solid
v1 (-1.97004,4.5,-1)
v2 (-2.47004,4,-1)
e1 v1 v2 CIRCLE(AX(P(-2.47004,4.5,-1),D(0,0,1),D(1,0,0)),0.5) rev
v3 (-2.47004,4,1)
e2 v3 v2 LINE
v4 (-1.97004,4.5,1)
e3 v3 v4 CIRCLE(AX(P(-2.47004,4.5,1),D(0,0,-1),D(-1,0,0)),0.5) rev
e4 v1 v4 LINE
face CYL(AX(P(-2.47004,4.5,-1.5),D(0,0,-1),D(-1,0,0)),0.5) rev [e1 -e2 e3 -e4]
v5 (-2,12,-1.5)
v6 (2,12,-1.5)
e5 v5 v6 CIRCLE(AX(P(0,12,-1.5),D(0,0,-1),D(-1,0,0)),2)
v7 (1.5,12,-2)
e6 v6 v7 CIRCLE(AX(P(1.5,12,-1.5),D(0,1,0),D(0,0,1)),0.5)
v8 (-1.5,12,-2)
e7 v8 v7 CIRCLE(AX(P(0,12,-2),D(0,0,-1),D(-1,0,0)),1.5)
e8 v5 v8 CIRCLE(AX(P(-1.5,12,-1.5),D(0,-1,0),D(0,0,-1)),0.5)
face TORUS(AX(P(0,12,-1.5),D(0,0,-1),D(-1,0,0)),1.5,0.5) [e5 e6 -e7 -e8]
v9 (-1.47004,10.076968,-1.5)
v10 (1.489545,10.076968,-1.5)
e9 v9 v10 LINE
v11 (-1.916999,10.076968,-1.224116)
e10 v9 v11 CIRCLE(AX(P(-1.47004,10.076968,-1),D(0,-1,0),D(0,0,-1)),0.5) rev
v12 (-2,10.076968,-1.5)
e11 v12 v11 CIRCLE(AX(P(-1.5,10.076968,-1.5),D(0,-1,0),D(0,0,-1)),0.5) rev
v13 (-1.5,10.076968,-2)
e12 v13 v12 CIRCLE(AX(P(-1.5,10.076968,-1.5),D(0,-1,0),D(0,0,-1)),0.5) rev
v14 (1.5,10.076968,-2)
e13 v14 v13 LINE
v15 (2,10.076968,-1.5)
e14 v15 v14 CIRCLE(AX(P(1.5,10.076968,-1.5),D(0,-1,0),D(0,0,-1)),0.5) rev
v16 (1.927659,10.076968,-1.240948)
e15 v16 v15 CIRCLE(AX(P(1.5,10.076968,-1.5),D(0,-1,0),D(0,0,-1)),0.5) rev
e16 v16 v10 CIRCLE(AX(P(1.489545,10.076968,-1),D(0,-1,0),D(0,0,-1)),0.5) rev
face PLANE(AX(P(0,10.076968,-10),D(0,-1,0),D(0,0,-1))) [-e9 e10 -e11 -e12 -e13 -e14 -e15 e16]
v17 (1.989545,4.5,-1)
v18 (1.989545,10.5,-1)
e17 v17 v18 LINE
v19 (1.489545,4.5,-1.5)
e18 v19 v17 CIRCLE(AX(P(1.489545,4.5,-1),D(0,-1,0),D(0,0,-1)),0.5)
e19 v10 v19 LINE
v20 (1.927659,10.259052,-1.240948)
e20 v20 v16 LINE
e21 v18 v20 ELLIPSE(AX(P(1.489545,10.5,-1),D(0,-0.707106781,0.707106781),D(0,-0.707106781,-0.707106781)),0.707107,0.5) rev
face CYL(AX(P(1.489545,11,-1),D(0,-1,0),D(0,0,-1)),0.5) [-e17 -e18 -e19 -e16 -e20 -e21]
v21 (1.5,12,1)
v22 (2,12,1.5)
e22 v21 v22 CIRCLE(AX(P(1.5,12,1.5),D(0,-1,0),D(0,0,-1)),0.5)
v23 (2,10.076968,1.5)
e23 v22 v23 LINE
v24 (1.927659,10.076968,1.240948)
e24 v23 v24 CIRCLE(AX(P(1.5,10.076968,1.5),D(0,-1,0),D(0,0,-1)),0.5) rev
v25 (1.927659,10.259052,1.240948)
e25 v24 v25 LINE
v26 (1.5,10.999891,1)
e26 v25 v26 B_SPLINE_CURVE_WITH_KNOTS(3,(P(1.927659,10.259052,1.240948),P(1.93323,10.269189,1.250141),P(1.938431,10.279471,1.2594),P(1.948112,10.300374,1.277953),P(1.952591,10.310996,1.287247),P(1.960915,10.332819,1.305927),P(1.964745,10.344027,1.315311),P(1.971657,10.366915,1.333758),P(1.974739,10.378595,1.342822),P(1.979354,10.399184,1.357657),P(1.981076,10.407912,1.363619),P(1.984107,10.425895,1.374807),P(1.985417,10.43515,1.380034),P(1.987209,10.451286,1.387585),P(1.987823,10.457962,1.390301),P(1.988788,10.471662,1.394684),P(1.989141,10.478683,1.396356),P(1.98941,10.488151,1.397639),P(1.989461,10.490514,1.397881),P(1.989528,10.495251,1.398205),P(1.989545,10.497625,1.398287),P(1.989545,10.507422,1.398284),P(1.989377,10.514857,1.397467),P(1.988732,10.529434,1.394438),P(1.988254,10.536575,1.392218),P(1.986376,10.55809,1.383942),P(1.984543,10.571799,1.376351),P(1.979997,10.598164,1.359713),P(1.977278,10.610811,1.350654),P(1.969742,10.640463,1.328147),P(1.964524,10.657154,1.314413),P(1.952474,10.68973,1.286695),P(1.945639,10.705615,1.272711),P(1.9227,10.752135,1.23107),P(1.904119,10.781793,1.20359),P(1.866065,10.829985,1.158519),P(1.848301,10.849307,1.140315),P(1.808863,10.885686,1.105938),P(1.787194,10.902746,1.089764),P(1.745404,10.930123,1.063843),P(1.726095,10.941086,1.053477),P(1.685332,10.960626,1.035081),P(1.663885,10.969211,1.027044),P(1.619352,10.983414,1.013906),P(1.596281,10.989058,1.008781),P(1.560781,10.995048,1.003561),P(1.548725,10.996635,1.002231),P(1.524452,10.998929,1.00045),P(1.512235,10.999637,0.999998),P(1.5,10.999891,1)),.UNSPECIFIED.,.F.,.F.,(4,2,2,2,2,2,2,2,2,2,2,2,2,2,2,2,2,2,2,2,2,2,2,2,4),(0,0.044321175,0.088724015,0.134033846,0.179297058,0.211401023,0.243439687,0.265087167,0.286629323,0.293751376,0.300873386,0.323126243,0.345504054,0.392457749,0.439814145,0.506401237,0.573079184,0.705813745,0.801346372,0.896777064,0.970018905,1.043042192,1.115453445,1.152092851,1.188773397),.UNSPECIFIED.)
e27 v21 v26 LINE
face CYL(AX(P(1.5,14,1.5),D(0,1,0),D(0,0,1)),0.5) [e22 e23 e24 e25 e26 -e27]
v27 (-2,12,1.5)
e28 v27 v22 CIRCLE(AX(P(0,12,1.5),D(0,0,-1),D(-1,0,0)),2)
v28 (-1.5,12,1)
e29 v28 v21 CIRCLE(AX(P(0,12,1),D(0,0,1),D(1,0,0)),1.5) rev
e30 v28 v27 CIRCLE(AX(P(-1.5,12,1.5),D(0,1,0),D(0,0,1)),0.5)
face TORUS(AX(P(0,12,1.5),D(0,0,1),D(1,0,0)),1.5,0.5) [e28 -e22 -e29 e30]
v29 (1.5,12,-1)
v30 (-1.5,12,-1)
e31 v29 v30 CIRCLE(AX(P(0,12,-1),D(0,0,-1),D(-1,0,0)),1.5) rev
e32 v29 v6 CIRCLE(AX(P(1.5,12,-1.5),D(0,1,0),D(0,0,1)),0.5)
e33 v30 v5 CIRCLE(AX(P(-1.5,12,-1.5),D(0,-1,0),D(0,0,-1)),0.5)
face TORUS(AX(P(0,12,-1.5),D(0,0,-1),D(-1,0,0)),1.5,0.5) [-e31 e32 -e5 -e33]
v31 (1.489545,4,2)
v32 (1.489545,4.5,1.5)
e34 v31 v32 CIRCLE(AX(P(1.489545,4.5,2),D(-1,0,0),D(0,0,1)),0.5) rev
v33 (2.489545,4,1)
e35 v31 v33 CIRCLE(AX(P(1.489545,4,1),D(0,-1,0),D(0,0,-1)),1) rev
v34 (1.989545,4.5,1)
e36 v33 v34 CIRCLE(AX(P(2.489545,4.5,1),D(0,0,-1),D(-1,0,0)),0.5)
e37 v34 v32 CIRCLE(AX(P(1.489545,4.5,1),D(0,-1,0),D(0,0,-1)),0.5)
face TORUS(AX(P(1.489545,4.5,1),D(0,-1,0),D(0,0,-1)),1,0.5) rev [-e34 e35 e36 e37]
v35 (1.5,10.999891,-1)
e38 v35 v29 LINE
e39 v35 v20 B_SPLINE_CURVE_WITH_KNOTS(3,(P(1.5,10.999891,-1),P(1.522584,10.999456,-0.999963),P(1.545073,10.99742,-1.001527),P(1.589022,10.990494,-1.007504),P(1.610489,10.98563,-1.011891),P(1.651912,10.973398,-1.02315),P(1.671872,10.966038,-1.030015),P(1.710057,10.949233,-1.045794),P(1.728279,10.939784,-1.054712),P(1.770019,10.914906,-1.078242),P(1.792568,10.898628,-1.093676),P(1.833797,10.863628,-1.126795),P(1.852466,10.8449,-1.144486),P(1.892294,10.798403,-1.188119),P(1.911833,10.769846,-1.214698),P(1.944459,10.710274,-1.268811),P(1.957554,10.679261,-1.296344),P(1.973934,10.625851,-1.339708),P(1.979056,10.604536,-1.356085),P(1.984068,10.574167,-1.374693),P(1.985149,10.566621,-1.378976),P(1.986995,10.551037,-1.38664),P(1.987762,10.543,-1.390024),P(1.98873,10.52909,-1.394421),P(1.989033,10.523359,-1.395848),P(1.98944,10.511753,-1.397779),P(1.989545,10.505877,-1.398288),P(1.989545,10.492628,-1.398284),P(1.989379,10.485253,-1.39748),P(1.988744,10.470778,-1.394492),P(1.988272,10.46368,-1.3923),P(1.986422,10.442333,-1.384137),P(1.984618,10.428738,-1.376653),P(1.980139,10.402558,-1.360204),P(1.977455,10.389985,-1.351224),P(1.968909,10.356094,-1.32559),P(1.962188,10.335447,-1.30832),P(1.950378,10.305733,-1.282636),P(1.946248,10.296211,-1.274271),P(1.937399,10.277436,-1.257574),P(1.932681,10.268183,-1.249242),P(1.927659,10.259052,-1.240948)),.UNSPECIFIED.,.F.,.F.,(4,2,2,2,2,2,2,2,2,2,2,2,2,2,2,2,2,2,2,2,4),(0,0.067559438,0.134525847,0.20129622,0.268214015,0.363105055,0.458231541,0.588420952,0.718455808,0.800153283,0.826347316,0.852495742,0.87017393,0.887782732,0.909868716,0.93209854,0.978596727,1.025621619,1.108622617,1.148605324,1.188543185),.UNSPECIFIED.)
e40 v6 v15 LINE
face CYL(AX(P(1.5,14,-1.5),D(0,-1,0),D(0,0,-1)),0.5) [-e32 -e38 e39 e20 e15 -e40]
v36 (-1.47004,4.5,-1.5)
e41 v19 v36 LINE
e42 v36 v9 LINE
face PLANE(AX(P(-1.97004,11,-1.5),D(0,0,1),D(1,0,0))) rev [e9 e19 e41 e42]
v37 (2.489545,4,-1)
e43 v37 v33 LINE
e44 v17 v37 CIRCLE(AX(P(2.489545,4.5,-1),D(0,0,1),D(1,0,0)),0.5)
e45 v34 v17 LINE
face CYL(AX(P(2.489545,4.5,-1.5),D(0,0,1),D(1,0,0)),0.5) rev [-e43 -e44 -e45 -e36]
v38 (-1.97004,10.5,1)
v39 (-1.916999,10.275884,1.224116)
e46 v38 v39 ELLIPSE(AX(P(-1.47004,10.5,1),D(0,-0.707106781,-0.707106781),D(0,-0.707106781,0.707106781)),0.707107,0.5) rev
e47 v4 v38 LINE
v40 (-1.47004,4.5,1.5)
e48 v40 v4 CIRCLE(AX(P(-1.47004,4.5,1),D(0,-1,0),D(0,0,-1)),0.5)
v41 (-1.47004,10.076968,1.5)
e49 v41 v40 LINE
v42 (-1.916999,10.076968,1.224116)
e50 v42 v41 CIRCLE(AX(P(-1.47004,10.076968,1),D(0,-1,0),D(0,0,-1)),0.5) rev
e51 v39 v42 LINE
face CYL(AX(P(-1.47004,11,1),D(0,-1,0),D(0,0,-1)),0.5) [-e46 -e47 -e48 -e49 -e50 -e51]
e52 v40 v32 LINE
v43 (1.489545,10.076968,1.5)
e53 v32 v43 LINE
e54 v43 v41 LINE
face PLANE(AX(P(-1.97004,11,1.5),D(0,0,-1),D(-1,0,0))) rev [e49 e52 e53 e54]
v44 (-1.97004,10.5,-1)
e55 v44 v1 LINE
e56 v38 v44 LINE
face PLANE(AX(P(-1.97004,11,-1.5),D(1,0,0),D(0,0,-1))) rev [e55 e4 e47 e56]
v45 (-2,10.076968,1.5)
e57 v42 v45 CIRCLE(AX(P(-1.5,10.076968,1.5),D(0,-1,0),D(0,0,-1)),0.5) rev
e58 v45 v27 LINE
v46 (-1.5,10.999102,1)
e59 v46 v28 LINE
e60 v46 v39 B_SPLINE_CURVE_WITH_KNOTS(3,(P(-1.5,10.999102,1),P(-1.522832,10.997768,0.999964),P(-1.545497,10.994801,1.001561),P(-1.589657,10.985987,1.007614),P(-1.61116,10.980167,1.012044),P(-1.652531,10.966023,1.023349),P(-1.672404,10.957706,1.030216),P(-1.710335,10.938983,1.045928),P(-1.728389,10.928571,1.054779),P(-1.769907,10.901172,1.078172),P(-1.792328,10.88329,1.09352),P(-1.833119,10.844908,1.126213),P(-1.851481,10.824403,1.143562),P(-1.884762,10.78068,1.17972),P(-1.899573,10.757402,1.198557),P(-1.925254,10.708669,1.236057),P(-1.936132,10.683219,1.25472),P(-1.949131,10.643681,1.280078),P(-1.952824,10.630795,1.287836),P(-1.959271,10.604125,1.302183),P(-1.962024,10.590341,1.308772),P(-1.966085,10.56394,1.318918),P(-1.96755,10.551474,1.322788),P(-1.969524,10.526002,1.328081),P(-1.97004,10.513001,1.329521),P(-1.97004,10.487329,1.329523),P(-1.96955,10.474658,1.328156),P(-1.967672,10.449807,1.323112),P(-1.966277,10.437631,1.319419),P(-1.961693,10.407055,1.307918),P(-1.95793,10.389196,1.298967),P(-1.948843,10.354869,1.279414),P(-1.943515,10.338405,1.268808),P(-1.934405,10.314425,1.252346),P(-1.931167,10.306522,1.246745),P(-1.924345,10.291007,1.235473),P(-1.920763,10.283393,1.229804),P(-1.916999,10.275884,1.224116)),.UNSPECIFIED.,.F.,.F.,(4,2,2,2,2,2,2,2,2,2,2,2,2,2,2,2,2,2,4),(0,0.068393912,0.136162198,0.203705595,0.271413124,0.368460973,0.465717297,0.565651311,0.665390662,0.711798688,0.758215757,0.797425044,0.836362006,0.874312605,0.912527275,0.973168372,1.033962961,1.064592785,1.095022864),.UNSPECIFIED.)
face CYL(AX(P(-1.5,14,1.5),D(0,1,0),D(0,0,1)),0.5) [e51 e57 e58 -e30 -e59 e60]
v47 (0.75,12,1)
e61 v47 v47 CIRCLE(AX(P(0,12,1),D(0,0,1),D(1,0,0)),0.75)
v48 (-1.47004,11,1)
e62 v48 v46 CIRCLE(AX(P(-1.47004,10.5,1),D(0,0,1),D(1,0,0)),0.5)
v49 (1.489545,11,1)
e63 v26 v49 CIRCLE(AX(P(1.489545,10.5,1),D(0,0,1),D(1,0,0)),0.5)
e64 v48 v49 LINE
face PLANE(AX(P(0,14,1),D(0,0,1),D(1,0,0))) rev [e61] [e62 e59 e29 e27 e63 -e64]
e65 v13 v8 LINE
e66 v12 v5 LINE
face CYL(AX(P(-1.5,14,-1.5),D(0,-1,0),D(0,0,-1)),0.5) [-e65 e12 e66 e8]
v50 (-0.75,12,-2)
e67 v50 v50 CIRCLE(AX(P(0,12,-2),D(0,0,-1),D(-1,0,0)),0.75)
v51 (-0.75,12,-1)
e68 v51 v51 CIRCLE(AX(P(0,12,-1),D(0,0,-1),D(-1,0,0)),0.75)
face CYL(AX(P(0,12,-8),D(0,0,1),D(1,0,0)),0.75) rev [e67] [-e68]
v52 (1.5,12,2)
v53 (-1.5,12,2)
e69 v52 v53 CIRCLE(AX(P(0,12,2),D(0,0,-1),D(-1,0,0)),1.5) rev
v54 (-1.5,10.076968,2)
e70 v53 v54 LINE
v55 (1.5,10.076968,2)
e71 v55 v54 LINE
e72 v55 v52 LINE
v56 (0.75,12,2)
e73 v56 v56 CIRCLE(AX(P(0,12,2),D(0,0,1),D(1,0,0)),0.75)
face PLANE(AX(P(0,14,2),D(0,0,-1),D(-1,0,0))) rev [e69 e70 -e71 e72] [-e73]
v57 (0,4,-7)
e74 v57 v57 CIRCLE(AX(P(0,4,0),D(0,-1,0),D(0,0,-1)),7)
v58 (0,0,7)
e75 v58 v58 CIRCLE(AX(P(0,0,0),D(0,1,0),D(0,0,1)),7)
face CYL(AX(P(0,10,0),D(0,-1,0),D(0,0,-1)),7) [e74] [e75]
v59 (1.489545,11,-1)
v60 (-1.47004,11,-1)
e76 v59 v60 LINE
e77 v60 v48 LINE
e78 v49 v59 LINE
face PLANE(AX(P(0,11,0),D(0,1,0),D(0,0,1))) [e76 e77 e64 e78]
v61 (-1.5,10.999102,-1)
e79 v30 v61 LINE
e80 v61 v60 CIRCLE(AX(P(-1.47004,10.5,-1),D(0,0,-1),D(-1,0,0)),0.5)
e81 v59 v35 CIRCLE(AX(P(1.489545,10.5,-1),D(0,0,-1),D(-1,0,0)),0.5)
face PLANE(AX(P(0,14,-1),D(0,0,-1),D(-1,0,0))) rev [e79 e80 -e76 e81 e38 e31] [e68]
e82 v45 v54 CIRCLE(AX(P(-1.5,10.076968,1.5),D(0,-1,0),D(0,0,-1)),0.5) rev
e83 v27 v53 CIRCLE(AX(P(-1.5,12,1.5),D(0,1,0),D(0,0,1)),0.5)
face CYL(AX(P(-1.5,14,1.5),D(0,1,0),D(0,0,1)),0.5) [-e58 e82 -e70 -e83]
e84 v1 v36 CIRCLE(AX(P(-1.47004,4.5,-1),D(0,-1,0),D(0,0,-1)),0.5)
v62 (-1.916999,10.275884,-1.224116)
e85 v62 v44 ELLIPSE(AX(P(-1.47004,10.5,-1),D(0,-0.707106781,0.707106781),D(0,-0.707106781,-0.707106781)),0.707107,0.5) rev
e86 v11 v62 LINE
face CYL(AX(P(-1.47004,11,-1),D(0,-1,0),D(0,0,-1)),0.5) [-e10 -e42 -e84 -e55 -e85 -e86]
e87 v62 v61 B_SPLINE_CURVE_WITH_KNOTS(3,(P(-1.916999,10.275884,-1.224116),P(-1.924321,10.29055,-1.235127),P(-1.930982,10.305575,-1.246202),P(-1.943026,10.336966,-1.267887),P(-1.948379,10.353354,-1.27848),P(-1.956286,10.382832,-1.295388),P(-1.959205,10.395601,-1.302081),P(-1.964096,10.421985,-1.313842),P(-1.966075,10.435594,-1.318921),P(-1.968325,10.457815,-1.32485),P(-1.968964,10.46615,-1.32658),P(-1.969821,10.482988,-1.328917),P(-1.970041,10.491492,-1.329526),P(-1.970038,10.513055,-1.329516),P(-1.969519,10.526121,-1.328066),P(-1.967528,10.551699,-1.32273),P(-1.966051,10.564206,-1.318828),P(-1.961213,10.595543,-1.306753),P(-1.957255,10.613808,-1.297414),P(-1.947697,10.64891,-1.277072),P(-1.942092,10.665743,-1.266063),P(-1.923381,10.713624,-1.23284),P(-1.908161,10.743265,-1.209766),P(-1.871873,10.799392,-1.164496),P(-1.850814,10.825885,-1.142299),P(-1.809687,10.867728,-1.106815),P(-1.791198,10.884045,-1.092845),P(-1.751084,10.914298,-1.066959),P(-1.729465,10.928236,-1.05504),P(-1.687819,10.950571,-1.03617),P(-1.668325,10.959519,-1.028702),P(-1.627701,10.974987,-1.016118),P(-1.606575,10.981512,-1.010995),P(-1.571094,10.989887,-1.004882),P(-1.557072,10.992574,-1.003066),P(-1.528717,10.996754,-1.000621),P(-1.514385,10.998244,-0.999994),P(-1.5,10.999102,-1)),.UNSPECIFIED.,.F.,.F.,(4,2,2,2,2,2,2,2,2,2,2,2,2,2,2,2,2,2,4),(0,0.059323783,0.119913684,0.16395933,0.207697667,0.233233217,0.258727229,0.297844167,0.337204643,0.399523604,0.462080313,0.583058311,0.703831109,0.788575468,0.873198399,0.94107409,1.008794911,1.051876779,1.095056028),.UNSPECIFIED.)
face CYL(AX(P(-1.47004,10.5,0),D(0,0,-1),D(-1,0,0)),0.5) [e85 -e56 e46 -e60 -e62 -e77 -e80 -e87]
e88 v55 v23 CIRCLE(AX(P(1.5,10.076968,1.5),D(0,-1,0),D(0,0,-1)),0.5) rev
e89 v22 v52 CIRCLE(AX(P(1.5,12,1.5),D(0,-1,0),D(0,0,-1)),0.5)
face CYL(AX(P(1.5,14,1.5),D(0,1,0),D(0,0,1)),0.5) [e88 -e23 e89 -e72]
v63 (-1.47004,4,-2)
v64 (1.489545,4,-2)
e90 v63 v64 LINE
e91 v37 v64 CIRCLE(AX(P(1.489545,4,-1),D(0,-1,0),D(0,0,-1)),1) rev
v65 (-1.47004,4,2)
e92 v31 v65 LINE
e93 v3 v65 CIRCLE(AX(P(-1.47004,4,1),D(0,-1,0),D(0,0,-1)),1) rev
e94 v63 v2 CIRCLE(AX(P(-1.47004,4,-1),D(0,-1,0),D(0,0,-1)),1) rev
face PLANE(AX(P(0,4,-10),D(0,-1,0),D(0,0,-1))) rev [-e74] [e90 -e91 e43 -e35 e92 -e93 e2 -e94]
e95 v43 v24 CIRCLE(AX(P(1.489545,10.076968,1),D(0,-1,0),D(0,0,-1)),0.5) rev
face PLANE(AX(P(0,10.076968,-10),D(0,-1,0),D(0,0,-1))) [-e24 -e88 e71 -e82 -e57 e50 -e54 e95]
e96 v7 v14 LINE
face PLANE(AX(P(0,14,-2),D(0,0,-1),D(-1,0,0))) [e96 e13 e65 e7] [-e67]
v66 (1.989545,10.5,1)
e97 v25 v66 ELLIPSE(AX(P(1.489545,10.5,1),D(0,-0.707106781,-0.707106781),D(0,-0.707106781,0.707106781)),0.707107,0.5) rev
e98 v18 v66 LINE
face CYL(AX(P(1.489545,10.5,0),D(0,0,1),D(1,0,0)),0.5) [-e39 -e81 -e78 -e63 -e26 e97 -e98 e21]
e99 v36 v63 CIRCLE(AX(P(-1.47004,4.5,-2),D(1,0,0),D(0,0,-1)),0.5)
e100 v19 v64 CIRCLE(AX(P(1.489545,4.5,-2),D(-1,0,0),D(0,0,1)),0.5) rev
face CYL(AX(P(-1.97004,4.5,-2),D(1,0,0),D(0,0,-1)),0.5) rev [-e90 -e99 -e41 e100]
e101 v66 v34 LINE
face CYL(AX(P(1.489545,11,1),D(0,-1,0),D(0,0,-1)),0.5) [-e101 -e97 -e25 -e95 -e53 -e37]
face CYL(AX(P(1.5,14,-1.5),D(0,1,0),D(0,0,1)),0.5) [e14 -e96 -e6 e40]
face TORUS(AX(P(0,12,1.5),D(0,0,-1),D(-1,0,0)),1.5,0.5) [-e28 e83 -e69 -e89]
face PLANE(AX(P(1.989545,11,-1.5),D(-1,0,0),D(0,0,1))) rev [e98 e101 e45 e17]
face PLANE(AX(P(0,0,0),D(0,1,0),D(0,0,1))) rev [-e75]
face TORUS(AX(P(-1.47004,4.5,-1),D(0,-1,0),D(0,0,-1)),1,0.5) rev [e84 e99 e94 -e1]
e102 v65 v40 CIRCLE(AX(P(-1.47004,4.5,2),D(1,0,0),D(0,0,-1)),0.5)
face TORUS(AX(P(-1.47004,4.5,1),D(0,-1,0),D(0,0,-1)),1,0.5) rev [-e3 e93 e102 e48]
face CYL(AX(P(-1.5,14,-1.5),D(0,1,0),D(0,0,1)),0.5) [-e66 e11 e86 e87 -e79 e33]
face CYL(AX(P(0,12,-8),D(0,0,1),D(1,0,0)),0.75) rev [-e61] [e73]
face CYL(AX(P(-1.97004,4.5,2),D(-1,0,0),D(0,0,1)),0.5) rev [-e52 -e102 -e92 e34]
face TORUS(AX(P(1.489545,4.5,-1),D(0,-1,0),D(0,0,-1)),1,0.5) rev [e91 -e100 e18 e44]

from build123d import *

# Parameters (mm, degrees)
SKETCH1_R           = 7
BOSS_EXTRUDE1_DEPTH = 10
SKETCH2_W           = 2
SKETCH2_H           = 1
BOSS_EXTRUDE2_DEPTH = 4
CUT_EXTRUDE2_DEPTH  = 10
FILLET1_R           = 1
FILLET2_R           = 0.5
CUT_EXTRUDE4_DEPTH  = 10
SKETCH5_W           = 3.959584723
SKETCH5_H           = 3
BOSS_EXTRUDE3_DEPTH = 7
FILLET3_R           = 0.5
FILLET4_R           = 0.5


# Some blends are built 0.0001 mm under size
with BuildPart() as part:
    # Sketch1 → Boss-Extrude1 (new body)
    with BuildSketch(Plane(origin=(0, 0, 0), x_dir=(1, 0, 0), z_dir=(0, 1, 0))):
        with Locations(Location((0, 0, 0), (0, 0, 270))):
            Circle(SKETCH1_R)
    extrude(amount=BOSS_EXTRUDE1_DEPTH)

    # Sketch2 → Boss-Extrude2 (add)
    with BuildSketch(Plane(origin=(0, 10, 0), x_dir=(1, 0, 0), z_dir=(0, 1, 0))):
        with Locations((-1, 1.5)):
            Rectangle(SKETCH2_W, SKETCH2_H)
        with Locations((1, 1.5)):
            Rectangle(SKETCH2_W, SKETCH2_H)
        with Locations((1, -1.5)):
            Rectangle(SKETCH2_W, SKETCH2_H)
        with Locations((-1, -1.5)):
            Rectangle(SKETCH2_W, SKETCH2_H)
    extrude(amount=BOSS_EXTRUDE2_DEPTH)

    # Sketch3 → Cut-Extrude2 (cut)
    with BuildSketch(Plane.XY.offset(2)):
        with BuildLine():
            Line((2, 14), (0, 14))
            ThreePointArc((0, 14), (1.414213562, 13.414213562), (2, 12))
            Line((2, 12), (2, 14))
        make_face()
        with BuildLine():
            Line((0, 14), (-2, 14))
            Line((-2, 14), (-1.414213562, 13.414213562))
            ThreePointArc((-1.414213562, 13.414213562), (-0.765366865, 13.847759065), (0, 14))
        make_face()
        with BuildLine():
            Line((-1.414213562, 13.414213562), (-2, 14))
            Line((-2, 14), (-2, 12))
            ThreePointArc((-2, 12), (-1.847759065, 12.765366865), (-1.414213562, 13.414213562))
        make_face()
        with BuildLine():
            ThreePointArc((0.75, 12), (0.287012574, 12.692909649), (-0.530330086, 12.530330086))
            Line((-0.530330086, 12.530330086), (0.530330086, 11.469669914))
            ThreePointArc((0.530330086, 11.469669914), (0.692909649, 11.712987426), (0.75, 12))
        make_face()
        with BuildLine():
            Line((0.530330086, 11.469669914), (-0.530330086, 12.530330086))
            ThreePointArc((-0.530330086, 12.530330086), (-0.530330086, 11.469669914), (0.530330086, 11.469669914))
        make_face()
    extrude(amount=-CUT_EXTRUDE2_DEPTH, mode=Mode.SUBTRACT)

    # Fillet1
    fillet1_edges = [part.edges().sort_by_distance(p)[0] for p in [
        (0, 10, -7),
    ]]
    fillet(fillet1_edges, radius=FILLET1_R)

    # Fillet2
    fillet2_edges = [part.edges().sort_by_distance(p)[0] for p in [
        (2, 11, 1),
        (-2, 11, 1),
        (2, 11, 2),
        (-2, 11, 2),
        (-2, 11, -2),
        (2, 11, -2),
        (-2, 11, -1),
        (2, 11, -1),
        (0, 14, 1),
        (0, 14, 2),
        (0, 14, -2),
        (0, 14, -1),
    ]]
    fillet(fillet2_edges, radius=FILLET2_R - 0.0001)  # a hair under: the kernel refuses the full size

    # Sketch4 → Cut-Extrude4 (cut, symmetric)
    with BuildSketch(Plane.XY):
        Polygon((-7, 4), (7, 4), (9.323554176, 4), (9.323554176, 10.076967931), (-7.870406088, 10.076967931), (-7.870406088, 4), align=None)
    extrude(amount=CUT_EXTRUDE4_DEPTH, both=True, mode=Mode.SUBTRACT)


with BuildPart() as cut_extrude4_piece_1:
    # of the separate pieces the step leaves, piece 1, a body of its own (cut_extrude4_pieces)
    add(part.part.solids().sort_by_distance((0, 0, 7))[0])



with BuildPart() as cut_extrude4_piece_2:
    # of the separate pieces the step leaves, piece 2, a body of its own (cut_extrude4_pieces)
    add(part.part.solids().sort_by_distance((-1.5001, 10.076967931, 2))[0])


with BuildPart() as cut_extrude4_piece_3:
    # of the separate pieces the step leaves, piece 3, a body of its own (cut_extrude4_pieces)
    add(part.part.solids().sort_by_distance((-2, 10.076967931, -1.5001))[0])


with BuildPart() as cut_extrude4_piece_1_1:
    add(cut_extrude4_piece_1.part)

    add(cut_extrude4_piece_2.part)  # Boss-Extrude3 merges Cut-Extrude4 piece 2

    add(cut_extrude4_piece_3.part)  # Boss-Extrude3 merges Cut-Extrude4 piece 3
    # Sketch5 → Boss-Extrude3 (add)
    with BuildSketch(Plane(origin=(0, 4, 0), x_dir=(1, 0, 0), z_dir=(0, 1, 0))):
        with Locations((0.009752672, 0)):
            Rectangle(SKETCH5_W, SKETCH5_H)
    extrude(amount=BOSS_EXTRUDE3_DEPTH)

    # Fillet3
    fillet3_edges = [cut_extrude4_piece_1_1.edges().sort_by_distance(p)[0] for p in [
        (-1.97003969, 11, 0),
        (1.989545033, 11, 0),
    ]]
    fillet(fillet3_edges, radius=FILLET3_R)

    # Fillet4
    # the kernel refuses this fillet: 0.5 mm, written as the material it takes off along each edge
    with BuildSketch(Plane(origin=(-1.97003969, 4, 1.5), x_dir=(0, 0, -1), z_dir=(0, 1, 0)), Plane(origin=(1.989545033, 4, 1.5), x_dir=(-1, 0, 0), z_dir=(0, 1, 0))) as fillet4_piece_1:
        with BuildLine():
            CenterArc((FILLET4_R, -FILLET4_R), FILLET4_R, 90, 90)
            Line((0, -FILLET4_R), (0, 0))
            Line((0, 0), (FILLET4_R, 0))
        make_face()
    extrude(amount=6.076967931, mode=Mode.SUBTRACT)
    with BuildSketch(Plane(origin=(-1.97003969, 4, 1.5), x_dir=(0, 0, -1), z_dir=(0, 1, 0))) as fillet4_piece_2_section:
        with BuildLine():
            CenterArc((FILLET4_R, -FILLET4_R), FILLET4_R, 90, 90)
            Line((0, -FILLET4_R), (0, 0))
            Line((0, 0), (FILLET4_R, 0))
        make_face()
    fillet4_piece_2 = extrude(amount=7.326967931, mode=Mode.PRIVATE)
    fillet4_piece_2 = fillet4_piece_2 - Plane(origin=(-1.47003969, 10.5, 1.201598319), x_dir=(-1, 0, 0), z_dir=(0, 0, -1)) * Cylinder(0.5, 17, mode=Mode.PRIVATE)
    fillet4_piece_2 = fillet4_piece_2 - Plane(origin=(-1.5001, 10.234965589, 1.4999), x_dir=(-1, 0, 0), z_dir=(0, -1, 0)) * Cylinder(0.4999, 17, mode=Mode.PRIVATE)
    add(fillet4_piece_2, mode=Mode.SUBTRACT)
    with BuildSketch(Plane(origin=(-1.97003969, 4, -1.5), x_dir=(0, 0, 1), z_dir=(0, 1, 0)), Plane(origin=(1.989545033, 4, -1.5), x_dir=(-1, 0, 0), z_dir=(0, 1, 0))) as fillet4_piece_3:
        with BuildLine():
            CenterArc((FILLET4_R, FILLET4_R), FILLET4_R, 180, 90)
            Line((0, FILLET4_R), (0, 0))
            Line((0, 0), (FILLET4_R, 0))
        make_face()
    extrude(amount=6.076967931, mode=Mode.SUBTRACT)
    with BuildSketch(Plane(origin=(-1.97003969, 4, -1.5), x_dir=(0, 0, 1), z_dir=(0, 1, 0))) as fillet4_piece_4_section:
        with BuildLine():
            CenterArc((FILLET4_R, FILLET4_R), FILLET4_R, 180, 90)
            Line((0, FILLET4_R), (0, 0))
            Line((0, 0), (FILLET4_R, 0))
        make_face()
    fillet4_piece_4 = extrude(amount=7.326967931, mode=Mode.PRIVATE)
    fillet4_piece_4 = fillet4_piece_4 - Plane(origin=(-1.5001, 10.234965589, -1.4999), x_dir=(-1, 0, 0), z_dir=(0, 1, 0)) * Cylinder(0.4999, 17, mode=Mode.PRIVATE)
    fillet4_piece_4 = fillet4_piece_4 - Plane(origin=(-1.47003969, 10.5, -1.201598319), x_dir=(-1, 0, 0), z_dir=(0, 0, -1)) * Cylinder(0.5, 17, mode=Mode.PRIVATE)
    add(fillet4_piece_4, mode=Mode.SUBTRACT)
    with BuildSketch(Plane(origin=(1.989545033, 4, -1.5), x_dir=(-1, 0, 0), z_dir=(0, 1, 0))) as fillet4_piece_5_section:
        with BuildLine():
            CenterArc((FILLET4_R, FILLET4_R), FILLET4_R, 180, 90)
            Line((0, FILLET4_R), (0, 0))
            Line((0, 0), (FILLET4_R, 0))
        make_face()
    fillet4_piece_5 = extrude(amount=7.326967931, mode=Mode.PRIVATE)
    fillet4_piece_5 = fillet4_piece_5 - Plane(origin=(1.489545033, 10.5, -1.228788283), x_dir=(1, 0, 0), z_dir=(0, 0, 1)) * Cylinder(0.5, 17, mode=Mode.PRIVATE)
    fillet4_piece_5 = fillet4_piece_5 - Plane(origin=(1.5001, 10.231594364, -1.4999), x_dir=(1, 0, 0), z_dir=(0, -1, 0)) * Cylinder(0.4999, 17, mode=Mode.PRIVATE)
    add(fillet4_piece_5, mode=Mode.SUBTRACT)
    with BuildSketch(Plane(origin=(1.989545033, 4, 1.5), x_dir=(-1, 0, 0), z_dir=(0, 1, 0))) as fillet4_piece_6_section:
        with BuildLine():
            CenterArc((FILLET4_R, -FILLET4_R), FILLET4_R, 90, 90)
            Line((0, -FILLET4_R), (0, 0))
            Line((0, 0), (FILLET4_R, 0))
        make_face()
    fillet4_piece_6 = extrude(amount=7.326967931, mode=Mode.PRIVATE)
    fillet4_piece_6 = fillet4_piece_6 - Plane(origin=(1.489545033, 10.5, 1.228788283), x_dir=(1, 0, 0), z_dir=(0, 0, 1)) * Cylinder(0.5, 17, mode=Mode.PRIVATE)
    fillet4_piece_6 = fillet4_piece_6 - Plane(origin=(1.5001, 10.231594364, 1.4999), x_dir=(1, 0, 0), z_dir=(0, 1, 0)) * Cylinder(0.4999, 17, mode=Mode.PRIVATE)
    add(fillet4_piece_6, mode=Mode.SUBTRACT)
    # the kernel refuses this fillet: 0.5 mm, written as the material it adds along each edge
    with BuildSketch(Plane(origin=(-1.97003969, 4, 1), x_dir=(0, 1, 0), z_dir=(0, 0, -1)), Plane(origin=(1.989545033, 4, -1), x_dir=(0, 1, 0), z_dir=(0, 0, 1))) as fillet4_2_piece_1:
        with BuildLine():
            CenterArc((FILLET4_R, -FILLET4_R), FILLET4_R, 90, 90)
            Line((0, -FILLET4_R), (0, 0))
            Line((0, 0), (FILLET4_R, 0))
        make_face()
    extrude(amount=2)
    with BuildSketch(Plane(origin=(-1.47003969, 4, -1.5), x_dir=(0, 0, -1), z_dir=(1, 0, 0))) as fillet4_2_piece_2:
        with BuildLine():
            CenterArc((FILLET4_R, FILLET4_R), FILLET4_R, 180, 90)
            Line((0, FILLET4_R), (0, 0))
            Line((0, 0), (FILLET4_R, 0))
        make_face()
    extrude(amount=2.959584723)
    with BuildSketch(Plane(origin=(1.489545033, 4, 1.5), x_dir=(0, 1, 0), z_dir=(-1, 0, 0))) as fillet4_2_piece_3:
        with BuildLine():
            CenterArc((FILLET4_R, -FILLET4_R), FILLET4_R, 90, 90)
            Line((0, -FILLET4_R), (0, 0))
            Line((0, 0), (FILLET4_R, 0))
        make_face()
    extrude(amount=2.959584723)
    with BuildSketch(Plane(origin=(1.489545033, 4, -1), x_dir=(0, 0, -1), z_dir=(-1, 0, 0))) as fillet4_2_piece_4:
        with BuildLine():
            CenterArc((0.5 + FILLET4_R, -FILLET4_R), FILLET4_R, 90, 90)
            Line((0.5 + FILLET4_R, 0), (0.5, 0))
            Line((0.5, 0), (0.5, -FILLET4_R))
        make_face()
    revolve(axis=Axis((1.489545033, 4, -1), (0, -1, 0)), revolution_arc=90)
    with BuildSketch(Plane(origin=(1.489545033, 4, 1), x_dir=(1, 0, 0), z_dir=(0, 0, -1))) as fillet4_2_piece_5:
        with BuildLine():
            CenterArc((0.5 + FILLET4_R, -FILLET4_R), FILLET4_R, 90, 90)
            Line((0.5 + FILLET4_R, 0), (0.5, 0))
            Line((0.5, 0), (0.5, -FILLET4_R))
        make_face()
    revolve(axis=Axis((1.489545033, 4, 1), (0, -1, 0)), revolution_arc=90)
    with BuildSketch(Plane(origin=(-1.47003969, 4, 1), x_dir=(-1, 0, 0), z_dir=(0, 0, -1))) as fillet4_2_piece_6:
        with BuildLine():
            CenterArc((0.5 + FILLET4_R, FILLET4_R), FILLET4_R, 180, 90)
            Line((0.5 + FILLET4_R, 0), (0.5, 0))
            Line((0.5, 0), (0.5, FILLET4_R))
        make_face()
    revolve(axis=Axis((-1.47003969, 4, 1), (0, 1, 0)), revolution_arc=90)
    with BuildSketch(Plane(origin=(-1.47003969, 4, -1), x_dir=(0, 0, -1), z_dir=(1, 0, 0))) as fillet4_2_piece_7:
        with BuildLine():
            CenterArc((0.5 + FILLET4_R, FILLET4_R), FILLET4_R, 180, 90)
            Line((0.5 + FILLET4_R, 0), (0.5, 0))
            Line((0.5, 0), (0.5, FILLET4_R))
        make_face()
    revolve(axis=Axis((-1.47003969, 4, -1), (0, 1, 0)), revolution_arc=90)


solid = cut_extrude4_piece_1_1.part
